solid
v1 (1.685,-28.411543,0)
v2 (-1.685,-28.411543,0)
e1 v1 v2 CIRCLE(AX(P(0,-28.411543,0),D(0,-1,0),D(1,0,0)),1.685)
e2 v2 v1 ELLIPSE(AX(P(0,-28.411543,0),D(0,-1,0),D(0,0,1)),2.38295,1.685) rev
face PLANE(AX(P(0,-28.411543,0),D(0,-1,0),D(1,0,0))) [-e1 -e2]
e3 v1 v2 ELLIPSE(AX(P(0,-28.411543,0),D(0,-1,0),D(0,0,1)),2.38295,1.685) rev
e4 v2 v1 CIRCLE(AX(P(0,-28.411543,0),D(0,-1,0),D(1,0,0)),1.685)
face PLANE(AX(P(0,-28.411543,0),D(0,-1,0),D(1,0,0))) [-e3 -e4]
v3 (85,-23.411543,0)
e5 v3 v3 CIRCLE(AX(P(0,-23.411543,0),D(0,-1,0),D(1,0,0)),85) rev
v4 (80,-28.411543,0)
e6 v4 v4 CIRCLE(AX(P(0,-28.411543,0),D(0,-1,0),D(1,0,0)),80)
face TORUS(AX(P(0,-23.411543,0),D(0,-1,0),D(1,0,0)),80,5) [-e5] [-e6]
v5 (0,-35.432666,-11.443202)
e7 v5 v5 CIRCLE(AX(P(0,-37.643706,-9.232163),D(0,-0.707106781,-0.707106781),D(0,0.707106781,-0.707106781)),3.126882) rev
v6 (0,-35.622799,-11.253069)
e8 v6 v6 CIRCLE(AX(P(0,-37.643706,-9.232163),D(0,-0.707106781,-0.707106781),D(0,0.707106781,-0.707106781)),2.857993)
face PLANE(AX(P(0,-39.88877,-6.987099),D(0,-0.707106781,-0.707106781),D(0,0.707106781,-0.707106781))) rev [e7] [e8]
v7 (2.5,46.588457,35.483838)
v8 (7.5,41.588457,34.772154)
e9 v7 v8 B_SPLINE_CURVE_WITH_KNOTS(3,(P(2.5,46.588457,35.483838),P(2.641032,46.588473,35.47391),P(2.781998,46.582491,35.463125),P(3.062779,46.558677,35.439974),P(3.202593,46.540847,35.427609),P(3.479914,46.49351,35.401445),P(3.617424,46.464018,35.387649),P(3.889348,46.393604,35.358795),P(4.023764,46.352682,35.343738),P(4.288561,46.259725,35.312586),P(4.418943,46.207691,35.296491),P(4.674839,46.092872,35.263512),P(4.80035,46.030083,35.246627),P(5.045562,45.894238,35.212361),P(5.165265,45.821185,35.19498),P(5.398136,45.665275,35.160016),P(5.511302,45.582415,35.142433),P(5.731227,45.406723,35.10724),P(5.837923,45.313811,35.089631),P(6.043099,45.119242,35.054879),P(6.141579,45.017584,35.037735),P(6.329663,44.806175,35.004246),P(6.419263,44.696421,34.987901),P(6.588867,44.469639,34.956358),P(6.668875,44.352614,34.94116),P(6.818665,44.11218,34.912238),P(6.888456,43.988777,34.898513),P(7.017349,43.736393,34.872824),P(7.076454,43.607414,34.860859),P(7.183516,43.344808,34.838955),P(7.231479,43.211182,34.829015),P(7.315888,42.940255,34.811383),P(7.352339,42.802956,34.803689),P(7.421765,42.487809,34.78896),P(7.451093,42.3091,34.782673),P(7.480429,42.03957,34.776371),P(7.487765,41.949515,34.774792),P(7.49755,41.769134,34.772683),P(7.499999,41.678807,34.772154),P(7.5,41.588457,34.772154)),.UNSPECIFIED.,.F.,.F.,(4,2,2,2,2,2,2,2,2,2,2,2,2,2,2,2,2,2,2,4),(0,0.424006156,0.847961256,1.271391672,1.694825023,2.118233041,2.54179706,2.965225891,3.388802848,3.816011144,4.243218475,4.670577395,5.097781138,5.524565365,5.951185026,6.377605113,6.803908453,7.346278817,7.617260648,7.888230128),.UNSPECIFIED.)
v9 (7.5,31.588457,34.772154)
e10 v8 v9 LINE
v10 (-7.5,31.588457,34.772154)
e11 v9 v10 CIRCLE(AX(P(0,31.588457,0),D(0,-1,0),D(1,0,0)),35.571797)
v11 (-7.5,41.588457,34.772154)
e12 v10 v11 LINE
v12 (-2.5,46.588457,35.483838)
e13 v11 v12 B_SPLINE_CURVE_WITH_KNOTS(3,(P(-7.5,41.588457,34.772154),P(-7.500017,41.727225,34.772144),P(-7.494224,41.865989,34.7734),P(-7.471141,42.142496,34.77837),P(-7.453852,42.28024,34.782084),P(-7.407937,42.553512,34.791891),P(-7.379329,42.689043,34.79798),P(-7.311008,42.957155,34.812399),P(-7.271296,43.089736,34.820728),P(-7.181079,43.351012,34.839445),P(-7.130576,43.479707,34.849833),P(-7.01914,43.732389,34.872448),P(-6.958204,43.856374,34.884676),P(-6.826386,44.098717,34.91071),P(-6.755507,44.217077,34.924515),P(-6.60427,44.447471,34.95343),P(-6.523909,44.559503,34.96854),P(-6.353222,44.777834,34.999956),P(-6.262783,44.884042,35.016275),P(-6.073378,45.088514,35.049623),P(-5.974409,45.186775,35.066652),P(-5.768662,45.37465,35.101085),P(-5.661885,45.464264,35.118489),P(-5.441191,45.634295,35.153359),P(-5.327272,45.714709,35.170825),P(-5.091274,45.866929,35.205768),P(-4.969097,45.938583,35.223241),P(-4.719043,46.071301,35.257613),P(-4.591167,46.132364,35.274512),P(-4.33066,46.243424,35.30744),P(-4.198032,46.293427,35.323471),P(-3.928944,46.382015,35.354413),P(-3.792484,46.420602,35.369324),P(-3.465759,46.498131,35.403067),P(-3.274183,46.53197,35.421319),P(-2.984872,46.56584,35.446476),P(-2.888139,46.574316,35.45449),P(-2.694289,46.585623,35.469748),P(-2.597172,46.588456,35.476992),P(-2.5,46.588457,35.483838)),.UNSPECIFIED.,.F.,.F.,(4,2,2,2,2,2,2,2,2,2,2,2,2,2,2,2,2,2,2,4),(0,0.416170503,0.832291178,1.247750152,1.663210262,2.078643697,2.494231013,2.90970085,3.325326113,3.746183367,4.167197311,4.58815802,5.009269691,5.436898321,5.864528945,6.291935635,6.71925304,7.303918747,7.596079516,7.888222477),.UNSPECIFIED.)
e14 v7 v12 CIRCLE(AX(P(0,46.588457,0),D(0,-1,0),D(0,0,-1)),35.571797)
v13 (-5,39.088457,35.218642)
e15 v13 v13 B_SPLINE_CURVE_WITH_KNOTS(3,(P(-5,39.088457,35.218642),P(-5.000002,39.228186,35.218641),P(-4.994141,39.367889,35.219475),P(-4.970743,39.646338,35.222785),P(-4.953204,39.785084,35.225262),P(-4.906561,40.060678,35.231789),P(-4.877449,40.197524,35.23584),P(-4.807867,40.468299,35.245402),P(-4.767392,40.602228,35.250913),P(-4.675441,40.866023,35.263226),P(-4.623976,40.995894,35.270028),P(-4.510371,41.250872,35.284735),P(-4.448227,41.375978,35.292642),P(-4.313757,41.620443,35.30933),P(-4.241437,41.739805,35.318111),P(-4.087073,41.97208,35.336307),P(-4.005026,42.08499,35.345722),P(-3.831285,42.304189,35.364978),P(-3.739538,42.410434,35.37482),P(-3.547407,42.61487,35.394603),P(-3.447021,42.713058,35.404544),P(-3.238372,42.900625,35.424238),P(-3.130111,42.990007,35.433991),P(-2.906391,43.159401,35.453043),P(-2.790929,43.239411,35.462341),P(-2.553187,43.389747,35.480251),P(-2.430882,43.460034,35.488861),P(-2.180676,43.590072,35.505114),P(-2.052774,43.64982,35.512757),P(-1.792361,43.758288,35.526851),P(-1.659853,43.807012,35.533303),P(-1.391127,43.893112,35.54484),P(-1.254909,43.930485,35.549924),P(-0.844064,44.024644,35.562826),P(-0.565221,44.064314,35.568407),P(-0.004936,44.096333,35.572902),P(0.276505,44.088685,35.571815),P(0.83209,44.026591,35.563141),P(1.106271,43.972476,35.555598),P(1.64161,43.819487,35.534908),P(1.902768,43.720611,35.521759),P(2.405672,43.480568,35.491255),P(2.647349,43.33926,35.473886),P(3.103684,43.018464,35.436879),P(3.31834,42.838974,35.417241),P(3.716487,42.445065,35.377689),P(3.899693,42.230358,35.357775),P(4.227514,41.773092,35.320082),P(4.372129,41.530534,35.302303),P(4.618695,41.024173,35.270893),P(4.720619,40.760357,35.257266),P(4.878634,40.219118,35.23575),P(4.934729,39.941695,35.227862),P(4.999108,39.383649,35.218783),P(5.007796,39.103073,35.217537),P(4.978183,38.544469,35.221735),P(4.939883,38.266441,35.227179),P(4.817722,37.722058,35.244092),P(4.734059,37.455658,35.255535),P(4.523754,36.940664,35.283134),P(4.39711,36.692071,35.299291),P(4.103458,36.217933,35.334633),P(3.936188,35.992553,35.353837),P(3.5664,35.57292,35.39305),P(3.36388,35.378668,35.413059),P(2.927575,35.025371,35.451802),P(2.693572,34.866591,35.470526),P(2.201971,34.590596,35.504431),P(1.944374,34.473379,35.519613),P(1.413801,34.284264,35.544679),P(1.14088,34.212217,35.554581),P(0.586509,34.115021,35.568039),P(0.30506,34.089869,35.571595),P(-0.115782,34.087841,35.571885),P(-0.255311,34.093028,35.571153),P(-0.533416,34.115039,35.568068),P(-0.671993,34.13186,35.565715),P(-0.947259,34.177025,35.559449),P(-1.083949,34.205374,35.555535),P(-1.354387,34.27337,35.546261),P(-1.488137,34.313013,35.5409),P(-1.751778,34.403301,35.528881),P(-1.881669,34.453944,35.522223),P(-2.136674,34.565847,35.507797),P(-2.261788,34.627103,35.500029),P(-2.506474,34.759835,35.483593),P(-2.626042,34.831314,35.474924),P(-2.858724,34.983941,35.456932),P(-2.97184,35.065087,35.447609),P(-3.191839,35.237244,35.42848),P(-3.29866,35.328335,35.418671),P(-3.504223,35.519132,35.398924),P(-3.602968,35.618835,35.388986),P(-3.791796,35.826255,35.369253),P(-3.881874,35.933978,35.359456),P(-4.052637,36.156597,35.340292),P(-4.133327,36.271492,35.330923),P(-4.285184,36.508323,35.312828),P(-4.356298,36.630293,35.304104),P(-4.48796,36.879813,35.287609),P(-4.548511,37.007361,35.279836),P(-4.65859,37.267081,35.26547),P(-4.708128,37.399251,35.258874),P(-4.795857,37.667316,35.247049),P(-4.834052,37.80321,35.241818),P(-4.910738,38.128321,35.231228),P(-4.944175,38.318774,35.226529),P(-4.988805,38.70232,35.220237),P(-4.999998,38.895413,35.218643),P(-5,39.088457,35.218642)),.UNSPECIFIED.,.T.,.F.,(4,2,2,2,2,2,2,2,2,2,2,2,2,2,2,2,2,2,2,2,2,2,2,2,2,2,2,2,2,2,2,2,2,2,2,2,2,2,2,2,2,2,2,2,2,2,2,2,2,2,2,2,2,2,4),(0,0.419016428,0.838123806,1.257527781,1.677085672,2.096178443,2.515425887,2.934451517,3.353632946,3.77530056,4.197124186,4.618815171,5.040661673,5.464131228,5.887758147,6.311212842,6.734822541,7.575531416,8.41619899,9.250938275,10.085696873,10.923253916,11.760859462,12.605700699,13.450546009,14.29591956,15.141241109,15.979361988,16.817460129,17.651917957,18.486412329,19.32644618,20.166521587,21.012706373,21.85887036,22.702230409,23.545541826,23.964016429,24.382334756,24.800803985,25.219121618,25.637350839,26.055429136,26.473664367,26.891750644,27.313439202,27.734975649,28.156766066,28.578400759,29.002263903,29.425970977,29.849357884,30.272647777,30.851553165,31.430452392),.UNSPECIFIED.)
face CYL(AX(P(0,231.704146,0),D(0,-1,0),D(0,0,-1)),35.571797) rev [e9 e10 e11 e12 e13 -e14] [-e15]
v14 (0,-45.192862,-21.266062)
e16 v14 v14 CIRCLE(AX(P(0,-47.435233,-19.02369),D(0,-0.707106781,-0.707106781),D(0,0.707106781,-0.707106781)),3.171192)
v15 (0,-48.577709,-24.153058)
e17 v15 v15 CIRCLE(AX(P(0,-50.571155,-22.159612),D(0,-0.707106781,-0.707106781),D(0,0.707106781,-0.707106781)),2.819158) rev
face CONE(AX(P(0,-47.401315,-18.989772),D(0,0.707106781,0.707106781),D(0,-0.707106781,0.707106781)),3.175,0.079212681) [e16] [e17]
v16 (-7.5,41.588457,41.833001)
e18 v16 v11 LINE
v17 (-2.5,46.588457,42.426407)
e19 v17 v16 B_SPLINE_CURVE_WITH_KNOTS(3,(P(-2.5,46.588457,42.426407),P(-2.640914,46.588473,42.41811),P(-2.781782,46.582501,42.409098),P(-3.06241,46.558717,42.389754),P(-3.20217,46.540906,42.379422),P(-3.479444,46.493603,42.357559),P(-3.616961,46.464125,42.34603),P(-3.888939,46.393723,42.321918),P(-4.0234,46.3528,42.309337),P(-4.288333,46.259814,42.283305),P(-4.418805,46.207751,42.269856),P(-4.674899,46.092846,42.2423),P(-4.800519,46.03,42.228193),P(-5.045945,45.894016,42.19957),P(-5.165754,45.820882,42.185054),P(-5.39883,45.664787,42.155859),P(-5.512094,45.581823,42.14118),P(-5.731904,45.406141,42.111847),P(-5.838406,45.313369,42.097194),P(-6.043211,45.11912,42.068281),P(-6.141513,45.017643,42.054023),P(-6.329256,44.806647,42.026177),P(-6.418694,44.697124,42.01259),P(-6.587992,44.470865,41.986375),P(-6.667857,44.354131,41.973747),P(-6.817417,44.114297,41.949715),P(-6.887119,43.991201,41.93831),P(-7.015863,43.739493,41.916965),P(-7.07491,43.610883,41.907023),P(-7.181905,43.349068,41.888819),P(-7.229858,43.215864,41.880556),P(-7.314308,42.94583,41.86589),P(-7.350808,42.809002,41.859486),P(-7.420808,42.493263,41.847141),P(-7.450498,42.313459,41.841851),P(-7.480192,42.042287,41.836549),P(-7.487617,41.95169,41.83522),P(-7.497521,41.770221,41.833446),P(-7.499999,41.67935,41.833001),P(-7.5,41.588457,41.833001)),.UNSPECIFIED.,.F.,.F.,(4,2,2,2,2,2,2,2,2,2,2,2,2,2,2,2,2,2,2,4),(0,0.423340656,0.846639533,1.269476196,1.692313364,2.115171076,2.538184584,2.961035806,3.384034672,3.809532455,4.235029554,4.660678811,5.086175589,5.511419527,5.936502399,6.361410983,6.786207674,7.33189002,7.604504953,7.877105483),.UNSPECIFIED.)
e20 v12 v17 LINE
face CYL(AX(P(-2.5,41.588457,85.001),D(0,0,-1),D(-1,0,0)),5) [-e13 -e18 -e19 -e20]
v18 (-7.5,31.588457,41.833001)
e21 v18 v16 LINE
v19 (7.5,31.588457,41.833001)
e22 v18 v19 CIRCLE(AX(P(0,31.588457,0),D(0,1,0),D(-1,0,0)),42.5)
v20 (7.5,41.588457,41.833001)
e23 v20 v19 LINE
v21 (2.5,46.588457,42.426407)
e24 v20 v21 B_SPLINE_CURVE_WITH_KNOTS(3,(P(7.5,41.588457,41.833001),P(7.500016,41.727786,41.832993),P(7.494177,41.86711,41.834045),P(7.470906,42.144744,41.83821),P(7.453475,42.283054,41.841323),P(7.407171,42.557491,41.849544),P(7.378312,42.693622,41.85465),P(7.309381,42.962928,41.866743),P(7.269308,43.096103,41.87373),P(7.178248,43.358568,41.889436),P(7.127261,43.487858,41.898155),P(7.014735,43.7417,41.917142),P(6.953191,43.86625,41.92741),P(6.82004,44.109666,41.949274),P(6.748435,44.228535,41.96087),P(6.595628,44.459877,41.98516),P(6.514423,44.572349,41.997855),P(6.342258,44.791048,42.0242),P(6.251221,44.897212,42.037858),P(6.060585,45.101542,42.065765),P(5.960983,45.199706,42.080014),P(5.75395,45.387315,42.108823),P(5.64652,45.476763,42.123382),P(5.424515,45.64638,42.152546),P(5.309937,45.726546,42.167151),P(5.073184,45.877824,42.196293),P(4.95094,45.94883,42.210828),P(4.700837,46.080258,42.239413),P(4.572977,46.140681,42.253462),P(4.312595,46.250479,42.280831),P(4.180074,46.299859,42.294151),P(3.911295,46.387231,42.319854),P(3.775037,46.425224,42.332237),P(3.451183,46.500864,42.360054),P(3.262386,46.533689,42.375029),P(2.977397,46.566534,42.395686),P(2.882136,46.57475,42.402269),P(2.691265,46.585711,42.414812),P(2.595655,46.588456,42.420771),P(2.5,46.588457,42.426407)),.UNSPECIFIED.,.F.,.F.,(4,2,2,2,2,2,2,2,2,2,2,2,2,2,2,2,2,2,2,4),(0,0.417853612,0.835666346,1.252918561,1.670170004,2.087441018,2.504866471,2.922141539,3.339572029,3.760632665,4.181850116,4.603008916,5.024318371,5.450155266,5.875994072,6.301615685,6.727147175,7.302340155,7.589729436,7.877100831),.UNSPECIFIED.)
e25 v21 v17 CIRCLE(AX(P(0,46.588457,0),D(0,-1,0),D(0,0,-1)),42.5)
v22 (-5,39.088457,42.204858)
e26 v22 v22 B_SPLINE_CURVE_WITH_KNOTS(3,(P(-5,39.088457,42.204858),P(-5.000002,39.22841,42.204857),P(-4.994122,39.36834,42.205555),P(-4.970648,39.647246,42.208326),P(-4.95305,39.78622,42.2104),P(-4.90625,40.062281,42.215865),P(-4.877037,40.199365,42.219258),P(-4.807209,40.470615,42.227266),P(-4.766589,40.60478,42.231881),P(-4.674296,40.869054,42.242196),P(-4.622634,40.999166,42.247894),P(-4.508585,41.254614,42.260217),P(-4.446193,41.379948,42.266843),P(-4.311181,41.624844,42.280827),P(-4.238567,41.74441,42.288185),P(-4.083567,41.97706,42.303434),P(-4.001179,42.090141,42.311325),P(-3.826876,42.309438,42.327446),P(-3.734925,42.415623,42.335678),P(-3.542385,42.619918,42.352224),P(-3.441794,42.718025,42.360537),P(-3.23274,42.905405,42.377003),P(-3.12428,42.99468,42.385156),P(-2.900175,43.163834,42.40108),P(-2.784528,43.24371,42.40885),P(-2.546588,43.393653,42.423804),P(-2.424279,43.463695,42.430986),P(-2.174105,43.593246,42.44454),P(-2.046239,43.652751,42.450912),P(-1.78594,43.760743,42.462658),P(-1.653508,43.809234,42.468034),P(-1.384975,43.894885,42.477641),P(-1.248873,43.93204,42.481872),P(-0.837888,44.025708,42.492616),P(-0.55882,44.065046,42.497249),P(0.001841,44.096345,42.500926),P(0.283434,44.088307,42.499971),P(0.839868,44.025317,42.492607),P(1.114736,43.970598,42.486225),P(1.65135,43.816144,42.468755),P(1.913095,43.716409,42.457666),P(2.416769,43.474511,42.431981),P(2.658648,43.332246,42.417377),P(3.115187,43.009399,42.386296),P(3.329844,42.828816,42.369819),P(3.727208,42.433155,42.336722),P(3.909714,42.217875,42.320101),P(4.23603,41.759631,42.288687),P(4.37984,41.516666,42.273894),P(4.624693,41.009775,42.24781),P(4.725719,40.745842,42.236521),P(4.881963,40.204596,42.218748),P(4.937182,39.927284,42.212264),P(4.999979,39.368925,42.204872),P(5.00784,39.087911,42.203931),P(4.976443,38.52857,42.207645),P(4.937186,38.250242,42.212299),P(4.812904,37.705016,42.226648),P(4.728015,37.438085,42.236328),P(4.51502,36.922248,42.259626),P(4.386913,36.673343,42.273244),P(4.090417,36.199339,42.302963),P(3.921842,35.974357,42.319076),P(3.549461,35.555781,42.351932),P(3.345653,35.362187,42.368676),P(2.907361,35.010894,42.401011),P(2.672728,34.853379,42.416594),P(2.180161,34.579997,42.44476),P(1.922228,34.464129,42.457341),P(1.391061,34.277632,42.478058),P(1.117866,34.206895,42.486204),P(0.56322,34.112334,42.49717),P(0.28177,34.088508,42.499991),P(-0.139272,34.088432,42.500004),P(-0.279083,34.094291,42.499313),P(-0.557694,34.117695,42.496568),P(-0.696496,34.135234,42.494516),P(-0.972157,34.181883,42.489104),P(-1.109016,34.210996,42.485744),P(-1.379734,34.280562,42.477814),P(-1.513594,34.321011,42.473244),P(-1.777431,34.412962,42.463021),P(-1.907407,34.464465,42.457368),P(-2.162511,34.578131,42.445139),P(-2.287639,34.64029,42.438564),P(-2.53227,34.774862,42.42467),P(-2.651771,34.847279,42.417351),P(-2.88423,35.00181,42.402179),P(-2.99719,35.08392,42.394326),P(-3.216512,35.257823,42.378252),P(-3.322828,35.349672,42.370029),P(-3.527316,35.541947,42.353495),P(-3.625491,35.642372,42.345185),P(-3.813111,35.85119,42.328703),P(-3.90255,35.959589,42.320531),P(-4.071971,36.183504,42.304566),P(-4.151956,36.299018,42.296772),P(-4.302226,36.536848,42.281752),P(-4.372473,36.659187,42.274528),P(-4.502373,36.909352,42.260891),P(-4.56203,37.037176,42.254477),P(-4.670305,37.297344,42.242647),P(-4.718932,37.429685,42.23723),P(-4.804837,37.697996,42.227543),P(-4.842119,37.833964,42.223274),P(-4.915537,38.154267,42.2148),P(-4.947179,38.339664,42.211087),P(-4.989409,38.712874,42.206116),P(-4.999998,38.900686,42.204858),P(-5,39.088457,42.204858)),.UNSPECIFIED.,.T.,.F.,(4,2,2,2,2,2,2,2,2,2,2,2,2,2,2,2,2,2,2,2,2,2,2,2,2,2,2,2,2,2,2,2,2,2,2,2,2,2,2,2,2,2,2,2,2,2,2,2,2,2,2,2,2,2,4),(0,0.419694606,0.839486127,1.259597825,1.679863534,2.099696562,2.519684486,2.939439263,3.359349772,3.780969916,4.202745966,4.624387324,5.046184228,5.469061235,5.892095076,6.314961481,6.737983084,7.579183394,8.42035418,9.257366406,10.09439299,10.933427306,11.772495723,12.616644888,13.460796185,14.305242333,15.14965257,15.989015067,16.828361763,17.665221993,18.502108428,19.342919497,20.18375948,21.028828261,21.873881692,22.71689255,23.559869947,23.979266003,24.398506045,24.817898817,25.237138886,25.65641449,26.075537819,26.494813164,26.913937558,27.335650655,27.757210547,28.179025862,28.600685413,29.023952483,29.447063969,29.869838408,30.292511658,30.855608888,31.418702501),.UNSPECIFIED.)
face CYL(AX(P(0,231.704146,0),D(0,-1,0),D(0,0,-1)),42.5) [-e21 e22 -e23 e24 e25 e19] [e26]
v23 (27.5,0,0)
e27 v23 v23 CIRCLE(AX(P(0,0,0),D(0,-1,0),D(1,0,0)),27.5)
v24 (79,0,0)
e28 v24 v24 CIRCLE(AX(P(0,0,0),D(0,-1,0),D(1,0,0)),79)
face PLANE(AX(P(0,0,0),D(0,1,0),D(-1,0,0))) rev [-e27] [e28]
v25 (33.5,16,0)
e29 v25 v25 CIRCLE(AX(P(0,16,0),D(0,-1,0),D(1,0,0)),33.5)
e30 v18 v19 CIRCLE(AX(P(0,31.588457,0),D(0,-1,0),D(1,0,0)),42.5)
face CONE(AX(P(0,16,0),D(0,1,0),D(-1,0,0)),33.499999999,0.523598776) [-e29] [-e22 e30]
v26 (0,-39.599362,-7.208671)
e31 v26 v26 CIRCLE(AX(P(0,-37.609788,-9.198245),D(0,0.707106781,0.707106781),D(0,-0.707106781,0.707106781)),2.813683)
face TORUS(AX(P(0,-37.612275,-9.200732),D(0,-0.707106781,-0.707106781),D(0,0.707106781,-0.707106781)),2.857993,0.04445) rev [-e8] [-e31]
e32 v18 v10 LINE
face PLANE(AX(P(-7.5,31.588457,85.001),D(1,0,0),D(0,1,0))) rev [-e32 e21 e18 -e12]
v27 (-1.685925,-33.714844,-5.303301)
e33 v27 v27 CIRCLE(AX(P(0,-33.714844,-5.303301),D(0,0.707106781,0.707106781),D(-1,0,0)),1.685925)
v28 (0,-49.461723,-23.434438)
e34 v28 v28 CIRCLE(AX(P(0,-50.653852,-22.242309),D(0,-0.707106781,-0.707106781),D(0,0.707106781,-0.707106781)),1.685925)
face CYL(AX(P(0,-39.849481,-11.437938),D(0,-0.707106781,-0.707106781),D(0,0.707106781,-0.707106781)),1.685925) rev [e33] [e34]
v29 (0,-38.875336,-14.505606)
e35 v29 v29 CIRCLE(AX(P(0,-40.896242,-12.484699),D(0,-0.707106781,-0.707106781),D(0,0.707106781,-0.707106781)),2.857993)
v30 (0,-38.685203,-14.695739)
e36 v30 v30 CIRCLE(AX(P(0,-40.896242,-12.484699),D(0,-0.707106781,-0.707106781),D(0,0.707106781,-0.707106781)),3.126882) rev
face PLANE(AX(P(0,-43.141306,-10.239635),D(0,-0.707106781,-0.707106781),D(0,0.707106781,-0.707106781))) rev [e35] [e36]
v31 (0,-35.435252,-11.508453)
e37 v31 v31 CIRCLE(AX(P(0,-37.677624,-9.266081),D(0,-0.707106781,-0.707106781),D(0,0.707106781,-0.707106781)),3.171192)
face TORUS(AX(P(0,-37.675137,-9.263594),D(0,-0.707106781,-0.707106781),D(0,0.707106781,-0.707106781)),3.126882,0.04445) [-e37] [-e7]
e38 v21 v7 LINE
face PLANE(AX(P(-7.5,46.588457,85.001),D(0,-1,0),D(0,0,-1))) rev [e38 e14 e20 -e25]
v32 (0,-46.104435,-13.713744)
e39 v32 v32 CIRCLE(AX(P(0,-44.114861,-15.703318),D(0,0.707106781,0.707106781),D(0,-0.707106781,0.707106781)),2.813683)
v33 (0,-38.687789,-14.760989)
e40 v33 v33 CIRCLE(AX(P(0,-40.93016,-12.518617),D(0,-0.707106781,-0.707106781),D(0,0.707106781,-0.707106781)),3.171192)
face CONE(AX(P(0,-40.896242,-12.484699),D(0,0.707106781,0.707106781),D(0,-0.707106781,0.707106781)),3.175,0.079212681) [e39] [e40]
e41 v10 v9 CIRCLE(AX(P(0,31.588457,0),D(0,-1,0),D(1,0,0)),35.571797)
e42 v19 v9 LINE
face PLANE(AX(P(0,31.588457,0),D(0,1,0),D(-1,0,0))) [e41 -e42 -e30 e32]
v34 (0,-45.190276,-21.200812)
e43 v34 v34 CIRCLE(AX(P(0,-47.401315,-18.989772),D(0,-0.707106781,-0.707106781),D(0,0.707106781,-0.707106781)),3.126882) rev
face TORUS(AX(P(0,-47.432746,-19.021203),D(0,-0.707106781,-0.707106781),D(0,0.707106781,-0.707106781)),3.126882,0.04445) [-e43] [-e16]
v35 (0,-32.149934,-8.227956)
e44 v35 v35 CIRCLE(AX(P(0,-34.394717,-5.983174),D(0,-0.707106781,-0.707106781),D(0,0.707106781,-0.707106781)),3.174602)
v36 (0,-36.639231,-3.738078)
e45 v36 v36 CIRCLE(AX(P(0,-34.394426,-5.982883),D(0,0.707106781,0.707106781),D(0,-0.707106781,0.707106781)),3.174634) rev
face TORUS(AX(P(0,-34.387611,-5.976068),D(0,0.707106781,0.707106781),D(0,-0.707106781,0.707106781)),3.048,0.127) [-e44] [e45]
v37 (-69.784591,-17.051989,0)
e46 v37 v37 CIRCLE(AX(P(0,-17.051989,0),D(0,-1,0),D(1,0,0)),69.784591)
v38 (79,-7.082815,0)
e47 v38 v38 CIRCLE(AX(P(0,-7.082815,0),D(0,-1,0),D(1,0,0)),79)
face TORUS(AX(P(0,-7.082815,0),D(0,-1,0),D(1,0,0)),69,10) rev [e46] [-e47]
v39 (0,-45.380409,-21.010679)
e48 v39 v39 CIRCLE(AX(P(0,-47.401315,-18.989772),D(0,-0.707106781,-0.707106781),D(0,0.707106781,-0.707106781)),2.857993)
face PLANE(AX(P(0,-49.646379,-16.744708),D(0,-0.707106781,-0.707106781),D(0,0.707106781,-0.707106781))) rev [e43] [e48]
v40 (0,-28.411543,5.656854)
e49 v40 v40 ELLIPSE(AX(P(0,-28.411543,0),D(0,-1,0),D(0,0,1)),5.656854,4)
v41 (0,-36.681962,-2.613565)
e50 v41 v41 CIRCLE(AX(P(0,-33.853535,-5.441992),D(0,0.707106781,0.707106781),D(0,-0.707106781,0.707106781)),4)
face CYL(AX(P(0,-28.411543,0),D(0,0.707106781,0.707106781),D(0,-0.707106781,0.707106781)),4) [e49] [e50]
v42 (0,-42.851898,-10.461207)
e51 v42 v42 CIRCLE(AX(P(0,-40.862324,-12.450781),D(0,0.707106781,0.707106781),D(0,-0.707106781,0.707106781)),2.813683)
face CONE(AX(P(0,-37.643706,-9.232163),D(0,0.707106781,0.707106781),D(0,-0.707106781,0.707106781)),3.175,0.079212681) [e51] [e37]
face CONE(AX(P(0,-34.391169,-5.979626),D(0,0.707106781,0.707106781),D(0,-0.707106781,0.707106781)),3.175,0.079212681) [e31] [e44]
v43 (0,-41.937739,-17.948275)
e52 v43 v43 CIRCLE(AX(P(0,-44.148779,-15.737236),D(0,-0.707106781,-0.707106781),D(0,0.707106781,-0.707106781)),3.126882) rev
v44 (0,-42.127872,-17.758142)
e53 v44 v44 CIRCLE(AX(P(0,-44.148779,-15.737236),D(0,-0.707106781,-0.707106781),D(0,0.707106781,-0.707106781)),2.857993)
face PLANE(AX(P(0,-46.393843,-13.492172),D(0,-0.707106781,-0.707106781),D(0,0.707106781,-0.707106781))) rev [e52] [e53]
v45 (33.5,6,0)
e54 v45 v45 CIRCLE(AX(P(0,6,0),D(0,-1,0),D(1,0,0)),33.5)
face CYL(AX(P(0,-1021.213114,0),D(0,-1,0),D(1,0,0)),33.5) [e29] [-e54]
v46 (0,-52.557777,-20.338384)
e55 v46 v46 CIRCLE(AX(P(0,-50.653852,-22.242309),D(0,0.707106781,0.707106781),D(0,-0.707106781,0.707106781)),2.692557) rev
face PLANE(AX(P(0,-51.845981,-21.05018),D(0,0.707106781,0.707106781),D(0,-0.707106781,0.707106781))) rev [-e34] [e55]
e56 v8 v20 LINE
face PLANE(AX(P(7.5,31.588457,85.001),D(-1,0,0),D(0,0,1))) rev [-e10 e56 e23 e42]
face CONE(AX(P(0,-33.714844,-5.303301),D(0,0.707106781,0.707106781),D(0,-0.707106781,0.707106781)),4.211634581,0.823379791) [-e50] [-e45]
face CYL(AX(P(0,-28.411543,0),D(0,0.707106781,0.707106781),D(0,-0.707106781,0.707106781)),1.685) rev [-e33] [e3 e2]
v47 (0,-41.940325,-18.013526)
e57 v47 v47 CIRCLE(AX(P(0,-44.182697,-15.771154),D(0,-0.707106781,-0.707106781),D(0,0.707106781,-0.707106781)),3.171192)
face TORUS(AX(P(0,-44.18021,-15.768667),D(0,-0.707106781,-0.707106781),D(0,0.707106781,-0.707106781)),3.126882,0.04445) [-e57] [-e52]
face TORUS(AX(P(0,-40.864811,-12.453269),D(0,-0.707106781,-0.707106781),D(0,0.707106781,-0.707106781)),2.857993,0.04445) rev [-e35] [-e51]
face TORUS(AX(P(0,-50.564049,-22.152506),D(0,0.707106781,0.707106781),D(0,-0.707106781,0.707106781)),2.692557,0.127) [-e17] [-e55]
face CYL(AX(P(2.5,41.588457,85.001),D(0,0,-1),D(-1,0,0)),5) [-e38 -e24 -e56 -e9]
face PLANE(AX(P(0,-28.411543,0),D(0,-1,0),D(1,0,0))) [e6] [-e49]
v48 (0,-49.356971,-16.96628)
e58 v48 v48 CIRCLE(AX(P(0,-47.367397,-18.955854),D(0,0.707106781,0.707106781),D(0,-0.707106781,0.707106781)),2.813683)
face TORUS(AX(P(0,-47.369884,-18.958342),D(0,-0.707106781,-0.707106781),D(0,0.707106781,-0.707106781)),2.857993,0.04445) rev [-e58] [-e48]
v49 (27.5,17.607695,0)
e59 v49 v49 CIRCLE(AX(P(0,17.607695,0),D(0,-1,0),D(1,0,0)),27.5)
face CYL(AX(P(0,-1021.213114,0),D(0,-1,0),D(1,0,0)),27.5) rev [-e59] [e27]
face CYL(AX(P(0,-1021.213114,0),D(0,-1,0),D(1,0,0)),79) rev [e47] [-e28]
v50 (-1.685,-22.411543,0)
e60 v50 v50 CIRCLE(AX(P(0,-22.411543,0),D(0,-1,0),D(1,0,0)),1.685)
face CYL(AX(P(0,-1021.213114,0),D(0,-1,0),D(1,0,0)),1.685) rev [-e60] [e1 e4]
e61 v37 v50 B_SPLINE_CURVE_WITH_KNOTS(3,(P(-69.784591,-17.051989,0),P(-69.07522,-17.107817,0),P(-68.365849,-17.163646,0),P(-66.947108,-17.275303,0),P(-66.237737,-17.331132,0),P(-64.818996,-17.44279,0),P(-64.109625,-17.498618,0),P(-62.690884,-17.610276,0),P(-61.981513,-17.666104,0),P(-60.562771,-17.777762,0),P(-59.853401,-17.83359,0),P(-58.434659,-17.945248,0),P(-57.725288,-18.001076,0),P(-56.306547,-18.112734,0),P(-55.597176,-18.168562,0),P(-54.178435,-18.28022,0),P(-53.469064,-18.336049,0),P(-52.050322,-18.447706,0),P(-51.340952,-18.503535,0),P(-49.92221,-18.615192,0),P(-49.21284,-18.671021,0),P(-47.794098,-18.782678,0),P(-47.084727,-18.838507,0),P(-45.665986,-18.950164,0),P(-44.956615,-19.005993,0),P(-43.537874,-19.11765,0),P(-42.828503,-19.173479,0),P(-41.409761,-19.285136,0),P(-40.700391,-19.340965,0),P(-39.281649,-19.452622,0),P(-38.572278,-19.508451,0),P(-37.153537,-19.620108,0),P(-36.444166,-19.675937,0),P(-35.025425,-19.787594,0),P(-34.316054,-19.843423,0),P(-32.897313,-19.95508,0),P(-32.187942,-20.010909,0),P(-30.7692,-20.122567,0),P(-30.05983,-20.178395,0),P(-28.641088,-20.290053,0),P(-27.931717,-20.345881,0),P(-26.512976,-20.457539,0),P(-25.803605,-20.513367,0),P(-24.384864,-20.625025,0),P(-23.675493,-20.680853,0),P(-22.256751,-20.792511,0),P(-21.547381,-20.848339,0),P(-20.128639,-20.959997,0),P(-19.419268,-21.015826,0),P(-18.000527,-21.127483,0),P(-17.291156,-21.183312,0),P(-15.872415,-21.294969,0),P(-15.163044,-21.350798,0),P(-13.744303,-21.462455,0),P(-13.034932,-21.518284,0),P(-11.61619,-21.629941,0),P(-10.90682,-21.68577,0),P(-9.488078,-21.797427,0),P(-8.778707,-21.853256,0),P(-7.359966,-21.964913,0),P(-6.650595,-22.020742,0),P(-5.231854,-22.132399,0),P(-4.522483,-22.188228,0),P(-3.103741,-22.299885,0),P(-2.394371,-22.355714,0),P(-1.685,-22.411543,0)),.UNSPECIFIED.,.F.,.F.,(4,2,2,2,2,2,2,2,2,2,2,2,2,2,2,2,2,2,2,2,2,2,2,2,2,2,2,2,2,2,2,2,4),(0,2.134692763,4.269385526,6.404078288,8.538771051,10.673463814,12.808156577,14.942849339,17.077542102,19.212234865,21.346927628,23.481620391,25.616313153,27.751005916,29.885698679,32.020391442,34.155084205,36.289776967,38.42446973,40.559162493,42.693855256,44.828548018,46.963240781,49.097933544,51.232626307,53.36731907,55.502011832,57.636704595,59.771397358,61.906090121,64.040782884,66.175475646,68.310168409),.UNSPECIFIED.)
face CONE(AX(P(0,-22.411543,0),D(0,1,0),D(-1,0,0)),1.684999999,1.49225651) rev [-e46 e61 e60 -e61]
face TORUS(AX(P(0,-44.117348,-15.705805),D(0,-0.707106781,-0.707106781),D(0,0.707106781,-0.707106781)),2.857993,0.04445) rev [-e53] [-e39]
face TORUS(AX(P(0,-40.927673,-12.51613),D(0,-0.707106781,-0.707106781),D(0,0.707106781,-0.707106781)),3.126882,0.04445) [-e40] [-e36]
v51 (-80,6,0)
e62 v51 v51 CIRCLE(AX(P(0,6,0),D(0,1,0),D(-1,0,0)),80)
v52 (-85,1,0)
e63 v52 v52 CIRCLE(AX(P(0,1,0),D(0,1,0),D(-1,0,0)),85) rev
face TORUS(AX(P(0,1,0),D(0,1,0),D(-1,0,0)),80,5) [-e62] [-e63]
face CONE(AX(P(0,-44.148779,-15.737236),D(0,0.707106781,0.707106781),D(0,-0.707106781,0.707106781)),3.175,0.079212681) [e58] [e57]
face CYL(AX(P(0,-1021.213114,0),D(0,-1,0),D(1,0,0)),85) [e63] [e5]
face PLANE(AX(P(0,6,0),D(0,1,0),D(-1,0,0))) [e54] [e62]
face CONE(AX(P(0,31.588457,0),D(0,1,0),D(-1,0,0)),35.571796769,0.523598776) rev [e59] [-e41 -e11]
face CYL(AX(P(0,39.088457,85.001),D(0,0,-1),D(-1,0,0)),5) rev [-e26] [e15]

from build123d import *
from build123d.topology import SkipClean

# Parameters (mm, degrees)
BOSS_EXTRUDE1_REACH   = 136.289
BOSS_EXTRUDE1_START   = 10
SKETCH3_R             = 4.999999999999999
CUT_EXTRUDE1_START    = 31.588457
SKETCH5_R             = 65.44827928739575
SKETCH5_R_2           = 42.49999999994049
SKETCH5_R_3           = 35.57179676962181
CUT_EXTRUDE1_DEPTH    = 15
FILLET1_R             = 5
BODY_MOVE_COPY2_ANGLE = 135


with BuildPart() as part:
    # Sketch1 → Revolve2 (revolve)
    with BuildSketch(Plane.XY):
        with BuildLine():
            Line((78.9999999999506, -7.082815352152523), (78.9999999999506, 0))
            Line((78.9999999999506, 0), (27.5, 0))
            Line((27.5, 0), (27.499999999950607, 17.607695154586704))
            Line((27.499999999950607, 17.607695154586704), (35.57179676967505, 31.588457268119768))
            Line((35.57179676967505, 31.588457268119768), (42.4999999999506, 31.58845726811976))
            Line((42.4999999999506, 31.58845726811976), (33.4999999999506, 15.999999999999993))
            Line((33.4999999999506, 15.999999999999993), (33.49999999995061, 5.999999999999995))
            Line((33.49999999995061, 5.999999999999995), (84.99999999995062, 6))
            Line((84.99999999995062, 6), (84.99999999995062, -28.41154273188018))
            Line((84.99999999995062, -28.41154273188018), (1.684999999950615, -28.41154273188001))
            Line((1.684999999950615, -28.41154273188001), (1.684999999950614, -22.411542731880015))
            Line((1.684999999950614, -22.411542731880015), (69.78459095722907, -17.051988689483803))
            ThreePointArc((69.78459095722907, -17.051988689483803), (76.34322509430746, -13.870822807481929), (78.9999999999506, -7.082815352152523))
        make_face()
    revolve(axis=Axis((6.9172706e-10, -1021.2131135818368, 0), (-2.4e-16, 1, 0)))

    # Boss-Extrude1: up to this cone (the profile starts inside it)
    boss_extrude1_end = Plane(origin=(6.9146915e-10, 31.800589, 0), z_dir=(-2.4e-16, 1, 0)).offset(-73.82429005227355) * Cone(1e-06, 146.2057373013694, 253.23576436403738, align=(Align.CENTER, Align.CENTER, Align.MIN), mode=Mode.PRIVATE)
    # Sketch3 → Boss-Extrude1 (add, up to the surface)
    with BuildSketch(Plane.XY.offset(BOSS_EXTRUDE1_START), mode=Mode.PRIVATE) as boss_extrude1_sk1:
        Polygon((-7.499999999999997, 31.588457268119768), (7.499999999999997, 31.588457268119768), (7.499999999999997, 46.58845726811977), (-7.500000000000001, 46.58845726811977), align=None)
        with Locations(Location((0, 39.08845726811977, 0), (0, 0, 229.681745219))):
            Circle(SKETCH3_R, mode=Mode.SUBTRACT)
    boss_extrude1_tool1 = extrude(boss_extrude1_sk1.sketch, amount=BOSS_EXTRUDE1_REACH, mode=Mode.PRIVATE) & boss_extrude1_end
    add(boss_extrude1_tool1.solids().sort_by_distance((0, 31.800589, 10))[0])

    # Sketch5 → Cut-Extrude1 (cut)
    # profile 1 of 2: a face of its own
    with BuildSketch(Plane(origin=(0, 0, 0), x_dir=(1, 0, 0), z_dir=(0, 1, 0)).offset(CUT_EXTRUDE1_START)):
        Circle(SKETCH5_R)
        Circle(SKETCH5_R_2, mode=Mode.SUBTRACT)
    # profile 2 of 2: a face of its own
    with BuildSketch(Plane(origin=(0, 0, 0), x_dir=(1, 0, 0), z_dir=(0, 1, 0)).offset(CUT_EXTRUDE1_START)):
        Circle(SKETCH5_R_3)
    extrude(amount=CUT_EXTRUDE1_DEPTH, mode=Mode.SUBTRACT)

    # Fillet1
    fillet1_edges = [part.edges().sort_by_distance(p)[0] for p in [
        (-84.99999999856767, 5.99999999999998, -1.041e-14),
        (-84.99999999856765, -28.41154273188024, -1.041e-14),
        (-7.500000000000001, 46.58845726811977, 38.302577890655776),
        (7.499999999999997, 46.58845726811977, 38.302577890655456),
    ]]
    fillet(fillet1_edges, radius=FILLET1_R)

    # Sketch7 → Revolve5 (revolve)
    with BuildSketch(Plane(origin=(0, 0, 0), x_dir=(0, 0, -1), z_dir=(1, 0, 0))):
        Polygon((4.111825932599789, -34.90631851707844), (-4.019902051045539, -26.774590533433148), (-5.656854249492396, -28.41154273188001), (2.474873734152933, -36.5432707155253), align=None)
    revolve(axis=Axis((0, -28.41154273188001, 0), (0, -0.707106781186546, -0.707106781186549)))


with BuildPart() as body_2:
    # 5218K687 COPY: read off the stored shape, not the designer's step
    # 5218K687 COPY outline → 5218K687 COPY (revolve)
    with BuildSketch(Plane.XZ):
        with BuildLine():
            Line((1.685925, 15.2796875), (1.685925, -8.6756875))
            Line((1.685925, -8.6756875), (3.175, -8.6756875))
            Line((3.175, -8.6756875), (3.175, -7.724251387))
            ThreePointArc((3.175, -7.724251387), (3.174900403, -7.719222697), (3.174601768, -7.714201894))
            Line((3.174601768, -7.714201894), (2.813682587, -3.167404823))
            ThreePointArc((2.813682587, -3.167404823), (2.825342421, -3.13372579), (2.857993206, -3.1194375))
            Line((2.857993206, -3.1194375), (3.126881794, -3.1194375))
            ThreePointArc((3.126881794, -3.1194375), (3.159532579, -3.10514921), (3.171192413, -3.071470177))
            Line((3.171192413, -3.071470177), (2.813682587, 1.432376427))
            ThreePointArc((2.813682587, 1.432376427), (2.825342421, 1.46605546), (2.857993206, 1.48034375))
            Line((2.857993206, 1.48034375), (3.126881794, 1.48034375))
            ThreePointArc((3.126881794, 1.48034375), (3.159532579, 1.49463204), (3.171192413, 1.528311073))
            Line((3.171192413, 1.528311073), (2.813682587, 6.032157677))
            ThreePointArc((2.813682587, 6.032157677), (2.825342421, 6.06583671), (2.857993206, 6.080125))
            Line((2.857993206, 6.080125), (3.126881794, 6.080125))
            ThreePointArc((3.126881794, 6.080125), (3.159532579, 6.09441329), (3.171192413, 6.128092323))
            Line((3.171192413, 6.128092323), (2.813682587, 10.631938927))
            ThreePointArc((2.813682587, 10.631938927), (2.825342421, 10.66561796), (2.857993206, 10.67990625))
            Line((2.857993206, 10.67990625), (3.126881794, 10.67990625))
            ThreePointArc((3.126881794, 10.67990625), (3.159532579, 10.69419454), (3.171192413, 10.727873573))
            Line((3.171192413, 10.727873573), (2.819158388, 15.162736993))
            ThreePointArc((2.819158388, 15.162736993), (2.778732934, 15.245975456), (2.69255662, 15.2796875))
            Line((2.69255662, 15.2796875), (1.685925, 15.2796875))
        make_face()
    revolve(axis=Axis((0, 0, 0), (0, 0, 1)))


with BuildPart() as body_2_1:
    # Body-Move/Copy2: read off the stored shape, not the designer's step
    # Body-Move/Copy2: moved
    add(body_2.part.moved(Location((0, 20.0899945, 36.265682))).rotate(Axis((0, 0, 0), (1, 0, 0)), BODY_MOVE_COPY2_ANGLE))


with BuildPart() as part_1:
    add(part.part)

    # Combine1: union body 2
    add(body_2_1.part)

    # Chamfer1: read off the stored shape, not the designer's step
    # Chamfer1 outline → Chamfer1 (revolve)
    with SkipClean():  # the faces are left unmerged after this step: merging them gives an invalid solid
        with BuildSketch(Plane(origin=(0, -14.205771366, 14.205771366), x_dir=(1, 0, 0), z_dir=(0, -0.707106781186549, 0.707106781186546))):
            with BuildLine():
                ThreePointArc((3.175, -28.541430643), (3.174908406, -28.54625315), (3.174633755, -28.551068701))
                Line((3.174633755, -28.551068701), (4, -27.786133746))
                Line((4, -27.786133746), (4, -27.58999453))
                Line((4, -27.58999453), (3.175, -27.58999453))
                Line((3.175, -27.58999453), (3.175, -28.541430643))
            make_face()
        revolve(axis=Axis((0, -14.205771366, 14.205771366), (0, 0.707106781186546, 0.707106781186549)))

    # Sketch1<4> → Cut-Revolve1 (revolve, cut)
    with SkipClean():  # the faces are left unmerged after this step: merging them gives an invalid solid
        with BuildSketch(Plane.XY, mode=Mode.PRIVATE) as cut_revolve1_sk:
            Polygon((6.9148244e-10, -22.411542731876818), (3.4574195e-10, -28.447491482233247), (1.684999999950615, -28.41154273188001), (1.684999999950614, -22.411542731880015), align=None)
        revolve(cut_revolve1_sk.sketch.rotate(Axis((6.9172706e-10, -1021.2131135818368, 0), (-2.4e-16, 1, 0)), 180), axis=Axis((6.9172706e-10, -1021.2131135818368, 0), (-2.4e-16, 1, 0)), mode=Mode.SUBTRACT)


solid = part_1.part
